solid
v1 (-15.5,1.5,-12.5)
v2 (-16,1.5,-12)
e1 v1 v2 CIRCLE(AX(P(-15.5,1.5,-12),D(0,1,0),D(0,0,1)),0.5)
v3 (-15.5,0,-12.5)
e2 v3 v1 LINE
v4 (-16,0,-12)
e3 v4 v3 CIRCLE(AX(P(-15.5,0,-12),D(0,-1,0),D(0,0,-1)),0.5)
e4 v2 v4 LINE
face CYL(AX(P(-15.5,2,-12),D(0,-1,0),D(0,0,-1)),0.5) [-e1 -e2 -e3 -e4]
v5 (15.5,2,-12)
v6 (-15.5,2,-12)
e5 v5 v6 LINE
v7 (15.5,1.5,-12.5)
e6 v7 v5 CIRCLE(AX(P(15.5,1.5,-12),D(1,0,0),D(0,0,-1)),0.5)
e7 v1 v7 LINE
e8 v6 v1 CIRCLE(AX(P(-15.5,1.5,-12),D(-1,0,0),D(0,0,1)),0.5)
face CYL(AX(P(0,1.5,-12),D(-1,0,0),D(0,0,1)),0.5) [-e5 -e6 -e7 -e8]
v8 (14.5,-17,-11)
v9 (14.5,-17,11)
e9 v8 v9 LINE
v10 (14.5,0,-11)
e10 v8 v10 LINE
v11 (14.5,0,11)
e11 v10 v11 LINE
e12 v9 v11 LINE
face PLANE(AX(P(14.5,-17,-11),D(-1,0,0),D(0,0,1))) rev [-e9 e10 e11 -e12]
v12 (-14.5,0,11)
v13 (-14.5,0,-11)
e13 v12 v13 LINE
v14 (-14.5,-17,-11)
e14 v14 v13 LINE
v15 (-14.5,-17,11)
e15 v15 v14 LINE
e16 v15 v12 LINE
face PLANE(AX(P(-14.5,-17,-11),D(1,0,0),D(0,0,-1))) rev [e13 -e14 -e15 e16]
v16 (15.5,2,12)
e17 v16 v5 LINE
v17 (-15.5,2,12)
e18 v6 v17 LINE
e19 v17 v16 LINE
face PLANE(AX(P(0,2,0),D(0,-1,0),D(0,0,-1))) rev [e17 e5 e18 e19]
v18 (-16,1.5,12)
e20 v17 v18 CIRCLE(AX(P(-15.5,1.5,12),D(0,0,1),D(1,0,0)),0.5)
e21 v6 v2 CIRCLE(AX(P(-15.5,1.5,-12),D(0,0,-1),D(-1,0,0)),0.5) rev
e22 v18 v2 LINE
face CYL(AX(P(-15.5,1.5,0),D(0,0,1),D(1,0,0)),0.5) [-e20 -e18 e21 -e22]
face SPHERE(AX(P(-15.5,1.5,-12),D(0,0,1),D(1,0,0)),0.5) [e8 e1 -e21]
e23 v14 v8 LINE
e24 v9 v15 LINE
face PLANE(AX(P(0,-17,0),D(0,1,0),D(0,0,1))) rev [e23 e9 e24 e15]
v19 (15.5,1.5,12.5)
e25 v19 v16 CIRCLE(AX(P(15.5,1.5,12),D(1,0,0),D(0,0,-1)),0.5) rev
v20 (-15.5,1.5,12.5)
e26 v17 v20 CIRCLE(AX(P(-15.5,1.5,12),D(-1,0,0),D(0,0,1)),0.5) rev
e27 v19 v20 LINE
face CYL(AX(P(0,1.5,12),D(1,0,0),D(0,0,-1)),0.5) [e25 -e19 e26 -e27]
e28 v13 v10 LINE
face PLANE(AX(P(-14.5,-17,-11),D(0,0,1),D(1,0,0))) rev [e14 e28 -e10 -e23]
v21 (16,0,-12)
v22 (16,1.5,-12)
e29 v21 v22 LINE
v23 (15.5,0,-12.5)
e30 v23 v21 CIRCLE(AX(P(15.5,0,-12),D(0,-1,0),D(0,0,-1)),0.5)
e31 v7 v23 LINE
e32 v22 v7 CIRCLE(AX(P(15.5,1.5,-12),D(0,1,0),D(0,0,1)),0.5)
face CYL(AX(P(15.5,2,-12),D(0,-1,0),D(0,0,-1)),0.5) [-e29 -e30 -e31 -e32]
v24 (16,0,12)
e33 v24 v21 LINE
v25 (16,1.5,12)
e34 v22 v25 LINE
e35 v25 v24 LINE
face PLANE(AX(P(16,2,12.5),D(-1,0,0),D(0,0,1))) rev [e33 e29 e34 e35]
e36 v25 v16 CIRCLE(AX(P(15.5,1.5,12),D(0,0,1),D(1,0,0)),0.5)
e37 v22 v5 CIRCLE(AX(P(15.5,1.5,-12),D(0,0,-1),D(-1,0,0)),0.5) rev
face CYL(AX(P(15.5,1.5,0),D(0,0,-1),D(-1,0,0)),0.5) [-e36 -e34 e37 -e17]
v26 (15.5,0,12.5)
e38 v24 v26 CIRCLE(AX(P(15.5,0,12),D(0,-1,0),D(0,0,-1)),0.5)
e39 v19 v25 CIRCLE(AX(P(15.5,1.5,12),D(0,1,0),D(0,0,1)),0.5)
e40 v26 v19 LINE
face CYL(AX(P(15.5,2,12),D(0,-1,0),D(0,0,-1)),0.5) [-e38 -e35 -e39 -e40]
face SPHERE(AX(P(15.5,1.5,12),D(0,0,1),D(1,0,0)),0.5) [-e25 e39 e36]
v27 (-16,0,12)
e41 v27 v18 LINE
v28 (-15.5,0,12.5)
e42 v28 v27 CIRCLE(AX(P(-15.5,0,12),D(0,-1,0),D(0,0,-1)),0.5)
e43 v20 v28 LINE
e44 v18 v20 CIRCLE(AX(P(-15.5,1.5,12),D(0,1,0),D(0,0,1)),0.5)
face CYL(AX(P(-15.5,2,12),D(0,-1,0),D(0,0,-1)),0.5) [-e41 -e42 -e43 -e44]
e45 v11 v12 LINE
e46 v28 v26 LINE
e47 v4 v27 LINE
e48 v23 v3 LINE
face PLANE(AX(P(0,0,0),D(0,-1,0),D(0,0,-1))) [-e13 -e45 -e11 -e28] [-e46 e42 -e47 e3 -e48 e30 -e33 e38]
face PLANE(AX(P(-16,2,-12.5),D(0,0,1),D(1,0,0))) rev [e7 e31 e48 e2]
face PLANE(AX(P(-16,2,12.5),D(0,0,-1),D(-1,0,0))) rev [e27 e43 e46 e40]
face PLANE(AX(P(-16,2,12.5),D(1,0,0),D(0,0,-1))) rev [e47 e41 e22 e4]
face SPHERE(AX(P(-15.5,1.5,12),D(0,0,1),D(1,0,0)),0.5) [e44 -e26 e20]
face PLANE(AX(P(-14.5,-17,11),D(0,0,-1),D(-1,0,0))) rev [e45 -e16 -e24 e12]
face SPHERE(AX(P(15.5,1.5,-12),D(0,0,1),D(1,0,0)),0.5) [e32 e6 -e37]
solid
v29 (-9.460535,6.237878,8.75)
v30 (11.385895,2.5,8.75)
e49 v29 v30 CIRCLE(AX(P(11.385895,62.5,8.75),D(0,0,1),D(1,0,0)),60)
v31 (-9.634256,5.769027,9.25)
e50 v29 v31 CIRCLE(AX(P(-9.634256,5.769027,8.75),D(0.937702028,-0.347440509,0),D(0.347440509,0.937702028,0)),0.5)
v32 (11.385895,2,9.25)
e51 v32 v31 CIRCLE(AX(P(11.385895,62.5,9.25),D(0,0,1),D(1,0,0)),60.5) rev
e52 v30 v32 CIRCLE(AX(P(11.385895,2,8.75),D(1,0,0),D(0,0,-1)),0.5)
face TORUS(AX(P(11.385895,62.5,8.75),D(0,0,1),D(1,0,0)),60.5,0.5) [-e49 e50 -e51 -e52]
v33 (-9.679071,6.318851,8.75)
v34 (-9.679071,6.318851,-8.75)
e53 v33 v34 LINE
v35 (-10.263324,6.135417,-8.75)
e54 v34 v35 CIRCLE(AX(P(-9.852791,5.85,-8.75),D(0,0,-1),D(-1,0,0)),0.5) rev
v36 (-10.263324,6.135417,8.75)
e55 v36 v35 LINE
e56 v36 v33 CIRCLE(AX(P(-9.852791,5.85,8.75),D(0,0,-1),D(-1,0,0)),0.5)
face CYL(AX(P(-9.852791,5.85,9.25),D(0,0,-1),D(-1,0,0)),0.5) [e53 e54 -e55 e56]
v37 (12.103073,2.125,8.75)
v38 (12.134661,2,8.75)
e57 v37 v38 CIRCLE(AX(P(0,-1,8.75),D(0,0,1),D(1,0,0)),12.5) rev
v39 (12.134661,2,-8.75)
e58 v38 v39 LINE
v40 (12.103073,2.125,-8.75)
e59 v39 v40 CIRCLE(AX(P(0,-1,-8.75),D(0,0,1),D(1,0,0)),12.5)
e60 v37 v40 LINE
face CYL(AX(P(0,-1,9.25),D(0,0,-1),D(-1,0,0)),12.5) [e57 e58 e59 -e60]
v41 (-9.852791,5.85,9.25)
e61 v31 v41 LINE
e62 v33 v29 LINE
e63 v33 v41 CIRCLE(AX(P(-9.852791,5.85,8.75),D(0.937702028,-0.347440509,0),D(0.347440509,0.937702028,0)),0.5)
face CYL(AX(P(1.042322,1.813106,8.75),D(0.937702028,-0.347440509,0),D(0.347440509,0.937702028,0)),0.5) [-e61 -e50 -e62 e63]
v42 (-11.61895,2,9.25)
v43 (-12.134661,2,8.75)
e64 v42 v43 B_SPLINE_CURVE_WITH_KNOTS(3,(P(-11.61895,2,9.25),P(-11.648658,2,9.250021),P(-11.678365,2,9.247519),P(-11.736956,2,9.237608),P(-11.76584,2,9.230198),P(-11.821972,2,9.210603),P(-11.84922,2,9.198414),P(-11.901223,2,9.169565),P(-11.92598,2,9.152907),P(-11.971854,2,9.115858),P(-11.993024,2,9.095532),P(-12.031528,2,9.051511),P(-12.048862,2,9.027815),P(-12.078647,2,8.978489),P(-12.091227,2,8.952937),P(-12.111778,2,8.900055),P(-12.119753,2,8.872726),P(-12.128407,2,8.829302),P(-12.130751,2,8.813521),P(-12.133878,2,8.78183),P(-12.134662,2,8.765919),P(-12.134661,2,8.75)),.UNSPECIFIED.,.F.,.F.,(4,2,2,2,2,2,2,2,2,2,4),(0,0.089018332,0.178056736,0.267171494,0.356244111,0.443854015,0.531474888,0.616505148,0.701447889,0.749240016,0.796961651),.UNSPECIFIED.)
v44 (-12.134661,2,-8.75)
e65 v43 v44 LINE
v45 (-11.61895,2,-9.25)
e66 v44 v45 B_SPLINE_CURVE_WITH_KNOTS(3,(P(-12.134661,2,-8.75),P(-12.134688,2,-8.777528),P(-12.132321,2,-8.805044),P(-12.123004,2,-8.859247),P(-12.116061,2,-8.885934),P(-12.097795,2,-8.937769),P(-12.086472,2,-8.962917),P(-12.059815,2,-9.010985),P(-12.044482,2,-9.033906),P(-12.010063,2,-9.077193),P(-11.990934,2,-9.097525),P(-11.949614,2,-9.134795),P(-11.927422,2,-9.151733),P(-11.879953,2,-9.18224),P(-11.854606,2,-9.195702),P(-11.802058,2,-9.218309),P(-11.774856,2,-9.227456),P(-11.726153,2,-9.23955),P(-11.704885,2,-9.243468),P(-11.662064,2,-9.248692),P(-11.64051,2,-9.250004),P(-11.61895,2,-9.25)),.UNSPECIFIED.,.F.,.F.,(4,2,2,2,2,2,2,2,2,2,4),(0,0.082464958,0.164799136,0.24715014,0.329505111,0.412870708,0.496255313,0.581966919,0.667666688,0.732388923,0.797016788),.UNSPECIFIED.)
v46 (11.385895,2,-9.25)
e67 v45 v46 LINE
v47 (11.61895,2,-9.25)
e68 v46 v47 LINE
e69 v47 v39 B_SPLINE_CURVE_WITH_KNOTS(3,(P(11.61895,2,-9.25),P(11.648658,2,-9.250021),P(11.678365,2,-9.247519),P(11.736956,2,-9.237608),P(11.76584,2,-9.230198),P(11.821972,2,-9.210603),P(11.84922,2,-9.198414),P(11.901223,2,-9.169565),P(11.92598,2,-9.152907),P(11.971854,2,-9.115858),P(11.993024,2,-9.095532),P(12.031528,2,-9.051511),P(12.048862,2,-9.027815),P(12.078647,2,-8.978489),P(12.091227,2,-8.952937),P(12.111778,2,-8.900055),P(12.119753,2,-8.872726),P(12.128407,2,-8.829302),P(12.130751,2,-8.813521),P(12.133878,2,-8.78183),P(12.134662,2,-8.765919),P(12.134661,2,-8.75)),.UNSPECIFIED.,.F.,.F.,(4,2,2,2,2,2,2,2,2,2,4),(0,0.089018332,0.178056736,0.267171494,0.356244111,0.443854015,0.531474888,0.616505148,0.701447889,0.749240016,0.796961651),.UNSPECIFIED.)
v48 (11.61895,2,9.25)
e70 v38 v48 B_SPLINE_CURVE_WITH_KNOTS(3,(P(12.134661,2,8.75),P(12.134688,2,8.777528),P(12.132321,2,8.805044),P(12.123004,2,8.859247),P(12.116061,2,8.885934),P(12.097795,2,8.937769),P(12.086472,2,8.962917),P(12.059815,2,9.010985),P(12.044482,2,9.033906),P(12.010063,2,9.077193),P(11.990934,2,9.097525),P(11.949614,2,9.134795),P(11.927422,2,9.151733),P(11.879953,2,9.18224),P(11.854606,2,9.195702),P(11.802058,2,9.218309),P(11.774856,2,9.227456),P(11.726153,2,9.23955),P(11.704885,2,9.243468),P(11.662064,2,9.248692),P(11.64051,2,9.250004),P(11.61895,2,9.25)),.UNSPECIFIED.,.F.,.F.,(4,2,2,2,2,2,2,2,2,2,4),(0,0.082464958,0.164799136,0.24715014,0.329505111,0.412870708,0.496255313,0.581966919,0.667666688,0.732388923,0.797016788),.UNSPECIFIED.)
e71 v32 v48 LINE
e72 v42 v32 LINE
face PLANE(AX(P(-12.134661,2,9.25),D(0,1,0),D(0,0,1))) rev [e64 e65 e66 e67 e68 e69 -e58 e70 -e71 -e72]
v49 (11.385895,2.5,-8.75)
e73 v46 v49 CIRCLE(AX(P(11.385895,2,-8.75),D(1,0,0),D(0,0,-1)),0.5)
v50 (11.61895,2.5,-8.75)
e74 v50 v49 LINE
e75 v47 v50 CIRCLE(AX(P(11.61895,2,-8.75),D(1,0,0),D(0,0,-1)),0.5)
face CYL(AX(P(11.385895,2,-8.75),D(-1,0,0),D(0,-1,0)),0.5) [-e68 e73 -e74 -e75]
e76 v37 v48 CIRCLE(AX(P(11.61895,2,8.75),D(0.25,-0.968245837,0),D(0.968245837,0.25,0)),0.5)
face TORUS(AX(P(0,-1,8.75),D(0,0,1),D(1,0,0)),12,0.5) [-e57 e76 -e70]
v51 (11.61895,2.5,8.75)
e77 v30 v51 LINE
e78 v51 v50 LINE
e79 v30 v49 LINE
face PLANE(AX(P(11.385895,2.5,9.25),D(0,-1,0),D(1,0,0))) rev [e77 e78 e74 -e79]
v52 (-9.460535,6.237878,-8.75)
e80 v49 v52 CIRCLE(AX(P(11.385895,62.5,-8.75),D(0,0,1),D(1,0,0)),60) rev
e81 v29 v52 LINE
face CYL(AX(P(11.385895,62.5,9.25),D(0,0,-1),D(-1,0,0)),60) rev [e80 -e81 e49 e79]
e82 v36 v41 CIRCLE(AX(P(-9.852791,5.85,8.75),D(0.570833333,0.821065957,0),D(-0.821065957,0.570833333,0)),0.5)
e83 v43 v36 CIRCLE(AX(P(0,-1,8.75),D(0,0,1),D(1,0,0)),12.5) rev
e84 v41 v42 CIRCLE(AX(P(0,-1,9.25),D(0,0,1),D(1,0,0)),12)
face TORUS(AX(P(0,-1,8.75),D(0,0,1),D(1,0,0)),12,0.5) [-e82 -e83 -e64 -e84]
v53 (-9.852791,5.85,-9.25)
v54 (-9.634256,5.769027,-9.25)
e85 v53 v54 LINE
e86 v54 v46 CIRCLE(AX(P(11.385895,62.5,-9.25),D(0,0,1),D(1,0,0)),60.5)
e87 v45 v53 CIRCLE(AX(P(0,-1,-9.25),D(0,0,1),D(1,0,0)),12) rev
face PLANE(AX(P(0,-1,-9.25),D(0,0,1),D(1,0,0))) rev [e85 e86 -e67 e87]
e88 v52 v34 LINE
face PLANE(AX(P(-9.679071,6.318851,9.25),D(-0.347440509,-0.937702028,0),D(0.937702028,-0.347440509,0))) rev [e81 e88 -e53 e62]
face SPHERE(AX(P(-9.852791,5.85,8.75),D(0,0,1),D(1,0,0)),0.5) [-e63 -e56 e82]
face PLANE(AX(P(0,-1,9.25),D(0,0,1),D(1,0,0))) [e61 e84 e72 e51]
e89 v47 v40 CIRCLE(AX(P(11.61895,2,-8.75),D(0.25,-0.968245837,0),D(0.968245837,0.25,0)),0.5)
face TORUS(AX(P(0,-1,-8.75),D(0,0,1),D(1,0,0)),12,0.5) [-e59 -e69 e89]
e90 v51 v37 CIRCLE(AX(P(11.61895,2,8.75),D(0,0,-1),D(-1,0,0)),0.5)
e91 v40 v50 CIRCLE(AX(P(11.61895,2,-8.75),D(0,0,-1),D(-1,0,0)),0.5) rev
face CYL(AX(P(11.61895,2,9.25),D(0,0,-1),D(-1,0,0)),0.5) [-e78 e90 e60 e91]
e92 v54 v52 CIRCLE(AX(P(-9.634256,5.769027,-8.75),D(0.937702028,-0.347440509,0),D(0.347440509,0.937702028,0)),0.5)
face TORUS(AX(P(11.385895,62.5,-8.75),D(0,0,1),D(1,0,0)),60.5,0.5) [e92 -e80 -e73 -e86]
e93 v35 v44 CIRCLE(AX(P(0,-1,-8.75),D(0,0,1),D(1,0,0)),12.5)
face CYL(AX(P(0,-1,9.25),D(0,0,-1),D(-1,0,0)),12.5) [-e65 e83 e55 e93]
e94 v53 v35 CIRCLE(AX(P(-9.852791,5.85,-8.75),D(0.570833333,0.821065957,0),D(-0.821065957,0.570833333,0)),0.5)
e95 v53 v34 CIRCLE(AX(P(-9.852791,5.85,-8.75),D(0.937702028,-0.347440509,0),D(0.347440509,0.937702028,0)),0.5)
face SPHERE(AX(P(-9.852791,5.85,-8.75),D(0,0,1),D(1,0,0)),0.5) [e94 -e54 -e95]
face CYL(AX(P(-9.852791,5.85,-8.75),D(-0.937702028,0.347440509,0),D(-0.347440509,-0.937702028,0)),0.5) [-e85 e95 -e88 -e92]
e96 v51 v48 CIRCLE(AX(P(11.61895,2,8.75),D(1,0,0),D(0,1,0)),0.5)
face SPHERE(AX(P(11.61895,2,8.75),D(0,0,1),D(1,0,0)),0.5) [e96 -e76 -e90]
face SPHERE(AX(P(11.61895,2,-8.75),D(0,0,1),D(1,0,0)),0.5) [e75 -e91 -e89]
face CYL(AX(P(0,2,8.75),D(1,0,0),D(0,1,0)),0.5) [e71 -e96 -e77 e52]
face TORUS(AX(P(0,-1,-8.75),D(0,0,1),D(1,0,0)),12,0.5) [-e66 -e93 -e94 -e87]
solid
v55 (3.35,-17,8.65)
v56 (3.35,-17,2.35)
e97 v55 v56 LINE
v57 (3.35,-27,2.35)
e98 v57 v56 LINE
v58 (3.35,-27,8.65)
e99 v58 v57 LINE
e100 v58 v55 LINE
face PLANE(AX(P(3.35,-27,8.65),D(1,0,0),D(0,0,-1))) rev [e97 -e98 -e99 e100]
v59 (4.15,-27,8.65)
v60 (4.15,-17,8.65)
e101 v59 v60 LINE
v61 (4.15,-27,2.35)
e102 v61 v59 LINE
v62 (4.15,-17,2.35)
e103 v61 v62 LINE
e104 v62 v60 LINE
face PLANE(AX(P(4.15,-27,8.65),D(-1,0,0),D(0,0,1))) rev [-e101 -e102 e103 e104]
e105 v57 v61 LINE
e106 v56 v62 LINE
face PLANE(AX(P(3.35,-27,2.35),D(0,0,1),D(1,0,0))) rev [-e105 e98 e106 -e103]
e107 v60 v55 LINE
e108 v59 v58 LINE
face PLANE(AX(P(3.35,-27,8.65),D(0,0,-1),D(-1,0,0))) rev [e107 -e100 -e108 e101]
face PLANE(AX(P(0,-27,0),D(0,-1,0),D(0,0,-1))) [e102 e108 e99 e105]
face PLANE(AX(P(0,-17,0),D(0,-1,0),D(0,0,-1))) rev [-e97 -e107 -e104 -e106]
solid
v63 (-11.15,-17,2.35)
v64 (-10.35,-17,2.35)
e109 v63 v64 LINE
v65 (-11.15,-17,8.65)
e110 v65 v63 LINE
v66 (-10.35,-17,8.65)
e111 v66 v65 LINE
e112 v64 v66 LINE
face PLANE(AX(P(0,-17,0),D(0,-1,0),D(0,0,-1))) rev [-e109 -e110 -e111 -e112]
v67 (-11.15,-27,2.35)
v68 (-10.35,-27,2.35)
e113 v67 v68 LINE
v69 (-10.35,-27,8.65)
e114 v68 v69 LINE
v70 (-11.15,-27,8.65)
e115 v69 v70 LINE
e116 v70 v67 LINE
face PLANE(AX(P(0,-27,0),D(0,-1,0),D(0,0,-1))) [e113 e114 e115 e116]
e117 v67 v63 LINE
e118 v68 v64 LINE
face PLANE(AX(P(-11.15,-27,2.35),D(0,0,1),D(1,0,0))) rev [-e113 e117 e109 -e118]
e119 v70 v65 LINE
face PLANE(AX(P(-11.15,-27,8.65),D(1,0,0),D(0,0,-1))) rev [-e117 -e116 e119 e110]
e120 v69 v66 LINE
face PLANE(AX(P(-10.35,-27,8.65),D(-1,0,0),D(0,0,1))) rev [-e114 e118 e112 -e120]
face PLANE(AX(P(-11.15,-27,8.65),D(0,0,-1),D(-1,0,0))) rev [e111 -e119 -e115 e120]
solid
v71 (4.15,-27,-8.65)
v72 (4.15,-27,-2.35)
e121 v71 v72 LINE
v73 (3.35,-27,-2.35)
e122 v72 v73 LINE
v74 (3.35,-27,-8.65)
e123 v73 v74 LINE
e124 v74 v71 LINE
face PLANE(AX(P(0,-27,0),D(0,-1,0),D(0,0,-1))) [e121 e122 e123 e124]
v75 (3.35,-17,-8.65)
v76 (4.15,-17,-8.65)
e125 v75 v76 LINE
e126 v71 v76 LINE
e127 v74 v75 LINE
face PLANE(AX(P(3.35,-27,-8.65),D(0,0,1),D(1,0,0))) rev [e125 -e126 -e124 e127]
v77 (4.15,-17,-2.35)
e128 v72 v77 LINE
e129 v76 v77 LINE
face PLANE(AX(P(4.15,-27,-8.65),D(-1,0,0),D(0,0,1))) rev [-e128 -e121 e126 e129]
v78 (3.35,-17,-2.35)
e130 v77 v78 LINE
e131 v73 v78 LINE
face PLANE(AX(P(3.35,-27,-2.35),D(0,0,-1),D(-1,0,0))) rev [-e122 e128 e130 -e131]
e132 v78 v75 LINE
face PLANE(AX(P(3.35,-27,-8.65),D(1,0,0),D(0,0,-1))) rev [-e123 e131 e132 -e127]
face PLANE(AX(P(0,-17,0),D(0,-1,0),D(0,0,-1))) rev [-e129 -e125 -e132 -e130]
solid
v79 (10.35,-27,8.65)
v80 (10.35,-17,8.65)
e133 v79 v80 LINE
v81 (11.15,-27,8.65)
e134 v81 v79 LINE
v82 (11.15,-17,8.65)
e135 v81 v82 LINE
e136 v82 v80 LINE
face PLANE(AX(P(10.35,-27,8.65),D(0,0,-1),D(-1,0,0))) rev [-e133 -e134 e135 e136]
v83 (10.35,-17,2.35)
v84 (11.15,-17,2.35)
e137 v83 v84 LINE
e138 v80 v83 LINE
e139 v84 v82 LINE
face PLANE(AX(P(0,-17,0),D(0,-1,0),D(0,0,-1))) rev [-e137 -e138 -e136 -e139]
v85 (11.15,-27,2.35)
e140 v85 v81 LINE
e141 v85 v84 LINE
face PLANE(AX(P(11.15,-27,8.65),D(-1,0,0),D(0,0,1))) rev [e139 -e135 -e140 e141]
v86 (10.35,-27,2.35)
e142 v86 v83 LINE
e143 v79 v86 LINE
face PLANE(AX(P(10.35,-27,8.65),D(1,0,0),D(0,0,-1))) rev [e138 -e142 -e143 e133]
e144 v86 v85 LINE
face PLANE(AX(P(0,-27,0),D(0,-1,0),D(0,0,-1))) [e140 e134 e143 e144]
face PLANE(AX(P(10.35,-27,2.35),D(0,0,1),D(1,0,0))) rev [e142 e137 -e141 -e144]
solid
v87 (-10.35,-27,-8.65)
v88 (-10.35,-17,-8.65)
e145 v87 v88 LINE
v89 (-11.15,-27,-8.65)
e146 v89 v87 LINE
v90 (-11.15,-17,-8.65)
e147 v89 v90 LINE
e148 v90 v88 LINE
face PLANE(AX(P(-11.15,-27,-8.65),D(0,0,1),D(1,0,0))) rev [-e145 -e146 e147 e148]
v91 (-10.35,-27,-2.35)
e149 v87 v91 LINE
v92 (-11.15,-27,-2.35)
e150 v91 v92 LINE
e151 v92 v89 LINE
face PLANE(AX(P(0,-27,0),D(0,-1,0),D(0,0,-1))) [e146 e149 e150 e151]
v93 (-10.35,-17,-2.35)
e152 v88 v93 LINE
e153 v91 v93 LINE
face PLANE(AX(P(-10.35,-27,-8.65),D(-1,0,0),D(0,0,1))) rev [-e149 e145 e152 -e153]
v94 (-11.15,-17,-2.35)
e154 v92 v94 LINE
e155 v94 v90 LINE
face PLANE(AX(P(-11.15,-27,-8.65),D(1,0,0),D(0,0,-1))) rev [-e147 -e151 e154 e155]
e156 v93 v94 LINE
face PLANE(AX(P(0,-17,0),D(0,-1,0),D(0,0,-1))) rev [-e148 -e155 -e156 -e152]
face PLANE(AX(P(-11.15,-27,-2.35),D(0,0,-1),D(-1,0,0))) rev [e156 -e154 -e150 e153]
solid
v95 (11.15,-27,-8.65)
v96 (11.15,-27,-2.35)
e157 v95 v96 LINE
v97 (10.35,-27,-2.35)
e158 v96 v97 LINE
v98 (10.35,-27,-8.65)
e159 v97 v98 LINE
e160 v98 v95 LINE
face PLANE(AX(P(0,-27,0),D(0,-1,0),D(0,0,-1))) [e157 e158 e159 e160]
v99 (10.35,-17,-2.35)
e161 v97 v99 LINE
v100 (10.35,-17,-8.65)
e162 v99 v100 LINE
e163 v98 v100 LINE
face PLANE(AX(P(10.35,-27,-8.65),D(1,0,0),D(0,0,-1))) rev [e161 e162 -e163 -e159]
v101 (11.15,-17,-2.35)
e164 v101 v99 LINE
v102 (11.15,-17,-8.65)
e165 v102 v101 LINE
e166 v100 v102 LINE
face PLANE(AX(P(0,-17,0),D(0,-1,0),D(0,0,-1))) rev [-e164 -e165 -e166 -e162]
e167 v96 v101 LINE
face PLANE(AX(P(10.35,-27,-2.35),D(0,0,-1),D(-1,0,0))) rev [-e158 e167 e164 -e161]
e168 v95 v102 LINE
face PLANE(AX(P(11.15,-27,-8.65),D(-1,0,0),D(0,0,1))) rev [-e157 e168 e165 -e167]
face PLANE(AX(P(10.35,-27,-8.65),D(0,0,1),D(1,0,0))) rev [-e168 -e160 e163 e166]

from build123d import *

# Parameters (mm, degrees)
ESQUISSE1_W          = 32
ESQUISSE1_H          = 25
BOSS_EXTRU_1_DEPTH   = 2
CONG_1_R             = 0.5
ESQUISSE2_W          = 29
ESQUISSE2_H          = 22
BOSS_EXTRU_2_DEPTH   = 17
ESQUISSE3_W          = 0.8
ESQUISSE3_H          = 6.3
BOSS_EXTRU_3_DEPTH   = 10
BOSS_EXTRU_3_2_DEPTH = 10
BOSS_EXTRU_3_3_DEPTH = 10
BOSS_EXTRU_3_4_DEPTH = 10
BOSS_EXTRU_3_5_DEPTH = 10
BOSS_EXTRU_3_6_DEPTH = 10
BOSS_EXTRU_4_DEPTH   = 9.25
CONG_2_R             = 0.5


with BuildPart() as part:
    # Esquisse1 → Boss.-Extru.1 (new body)
    with BuildSketch(Plane(origin=(0, 0, 0), x_dir=(1, 0, 0), z_dir=(0, 1, 0))):
        Rectangle(ESQUISSE1_W, ESQUISSE1_H)
    extrude(amount=BOSS_EXTRU_1_DEPTH)

    # Congé1
    cong_1_edges = [part.edges().sort_by_distance(p)[0] for p in [
        (-16, 2, 0),
        (0, 2, 12.5),
        (16, 2, 0),
        (0, 2, -12.5),
        (16, 1, 12.5),
        (-16, 1, 12.5),
        (-16, 1, -12.5),
        (16, 1, -12.5),
    ]]
    fillet(cong_1_edges, radius=CONG_1_R)

    # Esquisse2 → Boss.-Extru.2 (add)
    with BuildSketch(Plane.XZ):
        Rectangle(ESQUISSE2_W, ESQUISSE2_H)
    extrude(amount=BOSS_EXTRU_2_DEPTH)


with BuildPart() as body_2:
    # Esquisse3 → Boss.-Extru.3 (new body)
    with BuildSketch(Plane.XZ.offset(17)):
        with Locations((-10.75, 5.5)):
            Rectangle(ESQUISSE3_W, ESQUISSE3_H)
    extrude(amount=BOSS_EXTRU_3_DEPTH)


with BuildPart() as body_3:
    # Esquisse3 → Boss.-Extru.3 2 (new body)
    with BuildSketch(Plane.XZ.offset(17)):
        with Locations((10.75, 5.5)):
            Rectangle(ESQUISSE3_W, ESQUISSE3_H)
    extrude(amount=BOSS_EXTRU_3_2_DEPTH)


with BuildPart() as body_4:
    # Esquisse3 → Boss.-Extru.3 3 (new body)
    with BuildSketch(Plane.XZ.offset(17)):
        with Locations((3.75, 5.5)):
            Rectangle(ESQUISSE3_W, ESQUISSE3_H)
    extrude(amount=BOSS_EXTRU_3_3_DEPTH)


with BuildPart() as body_5:
    # Esquisse3 → Boss.-Extru.3 4 (new body)
    with BuildSketch(Plane.XZ.offset(17)):
        with Locations((3.75, -5.5)):
            Rectangle(ESQUISSE3_W, ESQUISSE3_H)
    extrude(amount=BOSS_EXTRU_3_4_DEPTH)


with BuildPart() as body_6:
    # Esquisse3 → Boss.-Extru.3 5 (new body)
    with BuildSketch(Plane.XZ.offset(17)):
        with Locations((10.75, -5.5)):
            Rectangle(ESQUISSE3_W, ESQUISSE3_H)
    extrude(amount=BOSS_EXTRU_3_5_DEPTH)


with BuildPart() as body_7:
    # Esquisse3 → Boss.-Extru.3 6 (new body)
    with BuildSketch(Plane.XZ.offset(17)):
        with Locations((-10.75, -5.5)):
            Rectangle(ESQUISSE3_W, ESQUISSE3_H)
    extrude(amount=BOSS_EXTRU_3_6_DEPTH)


with BuildPart() as body_8:
    # Esquisse4 → Boss.-Extru.4 (new, symmetric)
    with BuildSketch(Plane.XY):
        with BuildLine():
            Line((-12.1346611, 2), (12.1346611, 2))
            ThreePointArc((12.1346611, 2), (12.119028191, 2.062540727), (12.103072957, 2.125))
            ThreePointArc((12.103072957, 2.125), (11.925136256, 2.395284708), (11.618950039, 2.5))
            Line((11.618950039, 2.5), (11.38589526, 2.5))
            ThreePointArc((11.38589526, 2.5), (0.796450029, 3.441862121), (-9.460535289, 6.237878343))
            Line((-9.460535289, 6.237878343), (-9.679071228, 6.318851014))
            ThreePointArc((-9.679071228, 6.318851014), (-10.002565, 6.327040767), (-10.263324461, 6.135416667))
            ThreePointArc((-10.263324461, 6.135416667), (-11.388277176, 4.153362296), (-12.1346611, 2))
        make_face()
    extrude(amount=BOSS_EXTRU_4_DEPTH, both=True)

    # Congé2
    cong_2_edges = [body_8.edges().sort_by_distance(p)[0] for p in [
        (12.119028191, 2.062540727, 9.25),
        (-11.388277176, 4.153362296, -9.25),
        (11.925136256, 2.395284708, 9.25),
        (11.502422649, 2.5, 9.25),
        (0.796450029, 3.441862121, 9.25),
        (-9.569803259, 6.278364678, 9.25),
        (-10.002565, 6.327040767, 9.25),
        (-11.388277176, 4.153362296, 9.25),
        (-10.002565, 6.327040767, -9.25),
        (-9.569803259, 6.278364678, -9.25),
        (0.796450029, 3.441862121, -9.25),
        (11.502422649, 2.5, -9.25),
        (11.925136256, 2.395284708, -9.25),
        (12.119028191, 2.062540727, -9.25),
    ]]
    fillet(cong_2_edges, radius=CONG_2_R - 0.0001)  # a hair under: the kernel refuses the full size


solid = Compound([part.part, body_2.part, body_3.part, body_4.part, body_5.part, body_6.part, body_7.part, body_8.part])
